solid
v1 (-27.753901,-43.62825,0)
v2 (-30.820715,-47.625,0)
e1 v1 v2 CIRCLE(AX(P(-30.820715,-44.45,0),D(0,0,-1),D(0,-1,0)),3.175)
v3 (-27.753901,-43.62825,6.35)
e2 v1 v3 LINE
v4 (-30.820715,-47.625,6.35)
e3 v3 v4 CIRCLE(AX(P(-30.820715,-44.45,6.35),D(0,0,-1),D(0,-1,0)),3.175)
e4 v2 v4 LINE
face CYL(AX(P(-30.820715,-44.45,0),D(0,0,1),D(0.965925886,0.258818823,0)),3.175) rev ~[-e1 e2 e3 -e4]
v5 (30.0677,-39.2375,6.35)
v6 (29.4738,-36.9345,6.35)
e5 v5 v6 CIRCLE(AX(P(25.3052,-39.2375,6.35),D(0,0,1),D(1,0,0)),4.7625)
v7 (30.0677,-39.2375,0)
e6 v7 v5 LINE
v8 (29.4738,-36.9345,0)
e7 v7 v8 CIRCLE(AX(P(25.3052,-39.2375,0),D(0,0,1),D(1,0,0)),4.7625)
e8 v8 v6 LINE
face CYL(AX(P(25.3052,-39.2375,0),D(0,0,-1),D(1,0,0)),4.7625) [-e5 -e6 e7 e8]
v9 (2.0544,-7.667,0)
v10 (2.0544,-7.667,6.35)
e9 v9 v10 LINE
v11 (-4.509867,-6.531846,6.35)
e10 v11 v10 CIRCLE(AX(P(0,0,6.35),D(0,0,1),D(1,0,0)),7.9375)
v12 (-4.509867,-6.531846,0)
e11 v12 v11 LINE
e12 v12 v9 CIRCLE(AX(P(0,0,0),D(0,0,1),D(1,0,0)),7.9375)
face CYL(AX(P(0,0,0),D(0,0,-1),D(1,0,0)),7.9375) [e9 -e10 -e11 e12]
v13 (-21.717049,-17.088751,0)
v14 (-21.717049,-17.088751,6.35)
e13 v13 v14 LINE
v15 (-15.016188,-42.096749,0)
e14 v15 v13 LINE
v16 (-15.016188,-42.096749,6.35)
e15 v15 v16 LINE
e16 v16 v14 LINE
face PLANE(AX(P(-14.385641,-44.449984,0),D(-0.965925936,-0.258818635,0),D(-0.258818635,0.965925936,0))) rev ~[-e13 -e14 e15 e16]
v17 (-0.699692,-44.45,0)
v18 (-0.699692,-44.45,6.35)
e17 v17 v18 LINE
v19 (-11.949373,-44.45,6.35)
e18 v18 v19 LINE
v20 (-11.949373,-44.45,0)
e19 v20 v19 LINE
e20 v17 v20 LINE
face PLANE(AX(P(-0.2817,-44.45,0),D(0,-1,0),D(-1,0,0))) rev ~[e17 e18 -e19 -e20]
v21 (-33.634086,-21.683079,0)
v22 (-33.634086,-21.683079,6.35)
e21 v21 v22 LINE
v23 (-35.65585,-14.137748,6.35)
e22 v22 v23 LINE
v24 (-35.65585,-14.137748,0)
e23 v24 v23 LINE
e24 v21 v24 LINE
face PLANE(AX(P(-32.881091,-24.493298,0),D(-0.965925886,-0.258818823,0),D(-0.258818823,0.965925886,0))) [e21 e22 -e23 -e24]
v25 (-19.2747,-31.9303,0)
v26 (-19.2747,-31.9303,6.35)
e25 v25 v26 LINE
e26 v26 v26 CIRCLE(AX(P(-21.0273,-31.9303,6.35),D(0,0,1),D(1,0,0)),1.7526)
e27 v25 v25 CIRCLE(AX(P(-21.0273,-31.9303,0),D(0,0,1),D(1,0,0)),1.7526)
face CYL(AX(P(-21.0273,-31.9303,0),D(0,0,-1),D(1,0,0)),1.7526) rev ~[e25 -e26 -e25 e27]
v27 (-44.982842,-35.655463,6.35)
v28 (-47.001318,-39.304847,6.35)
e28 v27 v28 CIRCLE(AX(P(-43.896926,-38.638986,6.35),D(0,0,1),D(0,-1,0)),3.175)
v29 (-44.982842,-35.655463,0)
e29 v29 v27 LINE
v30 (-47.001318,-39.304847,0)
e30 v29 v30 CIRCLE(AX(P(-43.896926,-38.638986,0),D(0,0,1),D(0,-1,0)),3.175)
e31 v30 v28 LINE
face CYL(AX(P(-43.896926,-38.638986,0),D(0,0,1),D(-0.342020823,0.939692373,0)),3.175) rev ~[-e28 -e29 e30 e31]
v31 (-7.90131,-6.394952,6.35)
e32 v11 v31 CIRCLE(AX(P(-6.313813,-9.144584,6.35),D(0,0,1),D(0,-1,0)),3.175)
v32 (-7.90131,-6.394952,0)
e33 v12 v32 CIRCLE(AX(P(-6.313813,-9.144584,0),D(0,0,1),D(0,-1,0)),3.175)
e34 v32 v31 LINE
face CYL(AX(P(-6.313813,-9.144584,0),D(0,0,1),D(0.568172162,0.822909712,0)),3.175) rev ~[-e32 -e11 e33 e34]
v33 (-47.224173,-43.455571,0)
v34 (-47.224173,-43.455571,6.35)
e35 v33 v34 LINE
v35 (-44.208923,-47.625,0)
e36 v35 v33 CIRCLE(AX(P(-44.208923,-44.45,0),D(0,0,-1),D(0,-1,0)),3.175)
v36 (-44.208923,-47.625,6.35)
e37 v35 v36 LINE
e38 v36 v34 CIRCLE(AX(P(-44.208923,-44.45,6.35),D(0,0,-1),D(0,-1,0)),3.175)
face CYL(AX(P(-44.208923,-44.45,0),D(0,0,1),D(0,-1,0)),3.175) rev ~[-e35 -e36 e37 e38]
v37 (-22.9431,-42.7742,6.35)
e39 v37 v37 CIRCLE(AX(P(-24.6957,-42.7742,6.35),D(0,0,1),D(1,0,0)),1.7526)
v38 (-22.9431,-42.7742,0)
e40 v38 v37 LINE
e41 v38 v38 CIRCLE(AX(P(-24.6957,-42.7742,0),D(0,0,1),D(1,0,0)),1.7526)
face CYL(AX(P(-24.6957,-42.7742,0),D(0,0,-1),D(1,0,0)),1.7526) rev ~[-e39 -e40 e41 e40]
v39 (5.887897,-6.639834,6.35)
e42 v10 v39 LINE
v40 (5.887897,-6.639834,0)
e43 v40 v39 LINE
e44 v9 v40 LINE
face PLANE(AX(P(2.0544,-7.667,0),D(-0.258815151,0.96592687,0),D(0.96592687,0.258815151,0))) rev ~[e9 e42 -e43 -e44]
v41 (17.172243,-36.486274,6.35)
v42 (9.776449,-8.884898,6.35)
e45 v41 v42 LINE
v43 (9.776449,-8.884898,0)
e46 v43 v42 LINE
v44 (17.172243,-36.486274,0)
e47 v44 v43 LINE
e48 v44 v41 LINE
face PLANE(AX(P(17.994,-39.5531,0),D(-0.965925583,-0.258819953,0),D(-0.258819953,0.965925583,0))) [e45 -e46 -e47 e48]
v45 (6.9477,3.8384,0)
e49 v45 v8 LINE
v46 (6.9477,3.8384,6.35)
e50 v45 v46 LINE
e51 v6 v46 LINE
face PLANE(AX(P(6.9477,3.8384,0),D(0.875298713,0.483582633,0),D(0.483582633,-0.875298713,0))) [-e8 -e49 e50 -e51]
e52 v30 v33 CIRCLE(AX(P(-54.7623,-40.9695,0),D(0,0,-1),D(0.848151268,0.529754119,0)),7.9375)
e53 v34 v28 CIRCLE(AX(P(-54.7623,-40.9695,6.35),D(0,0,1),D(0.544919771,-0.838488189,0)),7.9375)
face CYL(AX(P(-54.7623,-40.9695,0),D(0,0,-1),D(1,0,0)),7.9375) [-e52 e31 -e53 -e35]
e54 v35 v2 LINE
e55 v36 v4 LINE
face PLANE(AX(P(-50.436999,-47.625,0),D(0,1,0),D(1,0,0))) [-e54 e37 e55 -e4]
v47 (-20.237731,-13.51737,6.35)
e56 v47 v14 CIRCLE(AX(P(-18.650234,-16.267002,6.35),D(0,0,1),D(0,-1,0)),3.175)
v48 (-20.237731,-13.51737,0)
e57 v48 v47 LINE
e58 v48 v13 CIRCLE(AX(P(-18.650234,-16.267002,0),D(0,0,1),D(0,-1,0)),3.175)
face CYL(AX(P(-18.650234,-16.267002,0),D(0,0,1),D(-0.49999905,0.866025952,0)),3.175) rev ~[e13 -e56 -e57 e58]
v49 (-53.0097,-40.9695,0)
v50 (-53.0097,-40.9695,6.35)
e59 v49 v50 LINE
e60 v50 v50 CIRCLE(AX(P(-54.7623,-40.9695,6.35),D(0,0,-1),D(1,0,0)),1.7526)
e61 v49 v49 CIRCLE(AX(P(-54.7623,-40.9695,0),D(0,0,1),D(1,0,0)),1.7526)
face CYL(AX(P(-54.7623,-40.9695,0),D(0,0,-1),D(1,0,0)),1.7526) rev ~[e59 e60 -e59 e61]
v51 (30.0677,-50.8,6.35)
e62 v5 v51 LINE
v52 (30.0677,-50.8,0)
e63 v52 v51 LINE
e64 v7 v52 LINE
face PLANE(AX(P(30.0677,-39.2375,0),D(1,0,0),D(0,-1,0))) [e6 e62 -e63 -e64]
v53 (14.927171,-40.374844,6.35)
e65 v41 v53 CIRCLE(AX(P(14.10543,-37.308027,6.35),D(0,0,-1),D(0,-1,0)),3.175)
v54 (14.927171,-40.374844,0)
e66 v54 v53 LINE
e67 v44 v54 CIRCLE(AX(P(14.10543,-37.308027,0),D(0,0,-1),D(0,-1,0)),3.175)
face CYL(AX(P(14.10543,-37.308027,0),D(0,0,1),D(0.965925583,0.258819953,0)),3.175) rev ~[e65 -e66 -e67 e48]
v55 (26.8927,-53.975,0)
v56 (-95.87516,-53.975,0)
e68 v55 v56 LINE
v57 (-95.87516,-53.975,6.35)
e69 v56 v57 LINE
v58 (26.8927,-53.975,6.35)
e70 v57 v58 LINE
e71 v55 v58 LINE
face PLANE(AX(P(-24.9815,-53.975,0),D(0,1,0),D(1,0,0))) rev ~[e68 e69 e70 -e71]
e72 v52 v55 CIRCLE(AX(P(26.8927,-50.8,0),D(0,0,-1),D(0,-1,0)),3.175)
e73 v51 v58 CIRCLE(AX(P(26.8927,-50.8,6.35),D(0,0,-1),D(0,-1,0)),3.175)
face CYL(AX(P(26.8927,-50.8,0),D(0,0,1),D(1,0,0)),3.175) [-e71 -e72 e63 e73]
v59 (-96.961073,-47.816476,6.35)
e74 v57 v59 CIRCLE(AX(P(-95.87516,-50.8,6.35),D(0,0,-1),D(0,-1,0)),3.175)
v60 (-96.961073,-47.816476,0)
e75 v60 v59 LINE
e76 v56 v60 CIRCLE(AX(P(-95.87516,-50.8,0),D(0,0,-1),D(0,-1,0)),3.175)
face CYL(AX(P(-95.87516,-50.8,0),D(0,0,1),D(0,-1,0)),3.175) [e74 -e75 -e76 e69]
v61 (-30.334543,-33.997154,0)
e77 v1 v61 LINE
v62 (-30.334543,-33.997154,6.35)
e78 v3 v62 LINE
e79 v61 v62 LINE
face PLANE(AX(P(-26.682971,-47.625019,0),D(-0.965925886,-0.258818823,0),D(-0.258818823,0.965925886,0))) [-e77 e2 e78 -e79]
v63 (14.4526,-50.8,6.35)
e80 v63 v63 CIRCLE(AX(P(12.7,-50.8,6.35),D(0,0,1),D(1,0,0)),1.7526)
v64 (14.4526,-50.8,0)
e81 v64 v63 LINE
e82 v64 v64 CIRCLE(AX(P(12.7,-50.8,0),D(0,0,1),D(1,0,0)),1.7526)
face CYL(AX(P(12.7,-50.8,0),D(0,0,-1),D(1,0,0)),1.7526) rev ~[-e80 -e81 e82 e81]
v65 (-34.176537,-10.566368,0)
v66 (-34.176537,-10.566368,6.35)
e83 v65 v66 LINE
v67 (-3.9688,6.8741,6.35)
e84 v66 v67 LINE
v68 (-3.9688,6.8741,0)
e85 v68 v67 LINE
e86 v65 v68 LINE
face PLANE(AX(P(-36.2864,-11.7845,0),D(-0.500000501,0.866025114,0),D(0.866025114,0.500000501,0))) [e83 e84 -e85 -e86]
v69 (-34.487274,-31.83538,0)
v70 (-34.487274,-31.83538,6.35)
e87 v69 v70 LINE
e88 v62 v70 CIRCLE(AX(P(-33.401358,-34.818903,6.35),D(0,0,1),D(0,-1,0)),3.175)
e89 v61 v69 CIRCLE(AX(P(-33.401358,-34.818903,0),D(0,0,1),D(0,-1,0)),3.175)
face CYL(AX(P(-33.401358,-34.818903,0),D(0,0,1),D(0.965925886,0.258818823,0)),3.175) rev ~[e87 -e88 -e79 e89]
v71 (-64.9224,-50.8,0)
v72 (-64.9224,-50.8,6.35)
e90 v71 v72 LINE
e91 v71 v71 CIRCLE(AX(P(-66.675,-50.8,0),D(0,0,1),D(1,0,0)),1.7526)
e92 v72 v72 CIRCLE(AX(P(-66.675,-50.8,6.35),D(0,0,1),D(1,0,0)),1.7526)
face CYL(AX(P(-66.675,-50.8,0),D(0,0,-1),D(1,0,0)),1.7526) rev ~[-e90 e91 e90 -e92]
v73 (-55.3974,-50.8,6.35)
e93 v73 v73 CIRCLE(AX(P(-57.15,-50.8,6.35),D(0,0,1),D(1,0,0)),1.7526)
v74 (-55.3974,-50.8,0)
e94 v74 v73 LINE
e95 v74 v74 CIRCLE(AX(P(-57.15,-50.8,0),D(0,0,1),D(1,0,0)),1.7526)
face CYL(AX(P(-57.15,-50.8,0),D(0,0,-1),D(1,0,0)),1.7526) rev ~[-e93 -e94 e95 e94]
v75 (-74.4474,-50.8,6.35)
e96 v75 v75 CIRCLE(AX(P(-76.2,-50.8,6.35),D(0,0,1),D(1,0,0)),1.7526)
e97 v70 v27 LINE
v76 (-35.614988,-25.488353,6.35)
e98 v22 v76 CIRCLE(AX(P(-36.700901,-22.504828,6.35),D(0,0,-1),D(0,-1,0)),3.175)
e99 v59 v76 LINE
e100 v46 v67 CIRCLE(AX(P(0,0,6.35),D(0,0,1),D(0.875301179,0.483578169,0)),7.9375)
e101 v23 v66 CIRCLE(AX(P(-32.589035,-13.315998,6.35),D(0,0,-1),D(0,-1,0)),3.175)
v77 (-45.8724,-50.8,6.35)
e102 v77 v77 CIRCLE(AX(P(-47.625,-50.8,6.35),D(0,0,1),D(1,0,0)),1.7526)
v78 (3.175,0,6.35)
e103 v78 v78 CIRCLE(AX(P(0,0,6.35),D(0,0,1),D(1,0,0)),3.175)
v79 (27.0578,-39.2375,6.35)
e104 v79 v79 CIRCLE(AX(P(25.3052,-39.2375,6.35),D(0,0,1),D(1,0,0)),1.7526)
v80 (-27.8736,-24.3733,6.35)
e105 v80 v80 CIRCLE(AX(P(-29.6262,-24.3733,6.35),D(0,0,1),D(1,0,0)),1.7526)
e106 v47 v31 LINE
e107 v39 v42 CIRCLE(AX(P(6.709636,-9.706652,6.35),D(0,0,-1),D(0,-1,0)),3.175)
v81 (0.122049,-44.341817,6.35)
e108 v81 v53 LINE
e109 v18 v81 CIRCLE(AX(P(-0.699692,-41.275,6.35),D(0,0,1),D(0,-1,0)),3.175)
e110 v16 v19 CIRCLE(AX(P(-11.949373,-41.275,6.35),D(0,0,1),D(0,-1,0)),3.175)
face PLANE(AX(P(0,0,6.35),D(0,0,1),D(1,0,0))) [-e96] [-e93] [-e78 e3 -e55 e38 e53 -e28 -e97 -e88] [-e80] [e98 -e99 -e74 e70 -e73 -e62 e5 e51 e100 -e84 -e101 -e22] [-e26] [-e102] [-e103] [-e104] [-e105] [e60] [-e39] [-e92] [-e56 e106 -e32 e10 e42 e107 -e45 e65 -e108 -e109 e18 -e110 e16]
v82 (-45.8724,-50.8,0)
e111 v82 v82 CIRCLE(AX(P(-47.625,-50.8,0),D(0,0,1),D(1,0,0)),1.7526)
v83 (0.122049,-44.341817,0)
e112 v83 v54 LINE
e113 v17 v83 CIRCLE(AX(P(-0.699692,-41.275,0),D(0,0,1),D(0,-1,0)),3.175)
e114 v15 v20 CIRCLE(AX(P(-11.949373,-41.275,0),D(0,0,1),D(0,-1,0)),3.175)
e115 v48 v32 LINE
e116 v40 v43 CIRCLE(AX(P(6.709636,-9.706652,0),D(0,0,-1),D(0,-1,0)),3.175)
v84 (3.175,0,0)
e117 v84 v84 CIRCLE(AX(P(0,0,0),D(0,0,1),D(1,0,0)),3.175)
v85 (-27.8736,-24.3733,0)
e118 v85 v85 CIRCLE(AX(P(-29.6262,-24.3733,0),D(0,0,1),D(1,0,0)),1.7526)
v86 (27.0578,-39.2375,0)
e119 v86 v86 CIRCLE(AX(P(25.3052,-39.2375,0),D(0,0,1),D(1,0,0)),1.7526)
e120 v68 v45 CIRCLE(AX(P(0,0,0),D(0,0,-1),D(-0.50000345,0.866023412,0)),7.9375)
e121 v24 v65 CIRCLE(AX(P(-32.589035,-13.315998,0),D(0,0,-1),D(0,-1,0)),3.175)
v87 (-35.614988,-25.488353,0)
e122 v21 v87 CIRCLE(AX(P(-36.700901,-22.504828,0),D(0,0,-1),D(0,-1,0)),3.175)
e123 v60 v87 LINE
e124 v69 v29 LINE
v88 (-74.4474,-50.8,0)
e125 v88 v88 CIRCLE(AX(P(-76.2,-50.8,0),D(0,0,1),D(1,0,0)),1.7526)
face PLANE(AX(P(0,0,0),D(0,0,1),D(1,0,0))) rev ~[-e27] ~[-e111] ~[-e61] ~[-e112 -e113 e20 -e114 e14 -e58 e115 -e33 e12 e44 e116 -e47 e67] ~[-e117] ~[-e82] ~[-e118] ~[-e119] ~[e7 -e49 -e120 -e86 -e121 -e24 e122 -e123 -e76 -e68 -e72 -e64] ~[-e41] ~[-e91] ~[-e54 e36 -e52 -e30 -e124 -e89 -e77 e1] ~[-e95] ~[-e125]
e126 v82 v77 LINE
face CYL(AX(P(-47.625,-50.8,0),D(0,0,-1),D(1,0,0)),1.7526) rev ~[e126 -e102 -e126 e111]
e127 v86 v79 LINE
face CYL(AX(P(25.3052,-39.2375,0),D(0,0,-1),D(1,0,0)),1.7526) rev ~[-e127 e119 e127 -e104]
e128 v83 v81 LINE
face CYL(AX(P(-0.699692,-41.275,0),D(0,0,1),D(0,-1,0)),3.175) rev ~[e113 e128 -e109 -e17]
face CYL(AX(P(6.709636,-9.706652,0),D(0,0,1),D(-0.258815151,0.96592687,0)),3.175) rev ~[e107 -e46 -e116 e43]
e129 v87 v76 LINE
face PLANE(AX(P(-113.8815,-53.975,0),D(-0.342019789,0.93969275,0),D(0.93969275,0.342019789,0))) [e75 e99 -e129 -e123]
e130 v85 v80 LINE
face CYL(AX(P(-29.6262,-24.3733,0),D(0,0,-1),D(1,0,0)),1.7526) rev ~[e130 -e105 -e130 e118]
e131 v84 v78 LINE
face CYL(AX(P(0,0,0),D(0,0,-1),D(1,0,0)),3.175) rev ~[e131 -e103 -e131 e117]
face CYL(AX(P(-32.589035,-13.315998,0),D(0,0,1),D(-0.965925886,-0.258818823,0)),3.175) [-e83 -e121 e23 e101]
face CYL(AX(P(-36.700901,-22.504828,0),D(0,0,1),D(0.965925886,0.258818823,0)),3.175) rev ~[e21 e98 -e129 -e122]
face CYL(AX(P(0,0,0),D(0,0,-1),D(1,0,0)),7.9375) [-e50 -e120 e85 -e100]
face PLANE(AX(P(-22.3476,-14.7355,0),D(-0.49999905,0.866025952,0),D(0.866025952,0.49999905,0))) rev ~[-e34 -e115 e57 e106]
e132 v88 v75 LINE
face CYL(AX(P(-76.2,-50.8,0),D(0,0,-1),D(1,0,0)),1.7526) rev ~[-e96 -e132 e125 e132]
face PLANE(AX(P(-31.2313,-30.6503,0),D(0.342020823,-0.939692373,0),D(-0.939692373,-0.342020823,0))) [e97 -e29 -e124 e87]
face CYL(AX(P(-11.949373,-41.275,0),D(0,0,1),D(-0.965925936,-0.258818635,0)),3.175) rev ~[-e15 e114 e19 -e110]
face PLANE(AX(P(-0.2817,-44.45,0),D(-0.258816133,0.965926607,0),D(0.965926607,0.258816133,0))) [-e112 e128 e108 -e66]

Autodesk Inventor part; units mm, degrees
ref_plane "YZ Plane" through (0, 0, 0) normal (1, 0, 0) x (0, 1, 0)
ref_plane "XZ Plane" through (0, 0, 0) normal (0, 1, 0) x (-1, 0, 0)
ref_plane "XY Plane" through (0, 0, 0) normal (0, 0, 1) x (1, 0, 0)
sketch "Sketch2" plane through (0, 0, 0) normal (0, 0, 1) x (1, 0, 0)
  circle A0 centre (0, 0) radius 3.175
  circle A1 centre (0, 0) radius 7.9375
  line L0 (-24.9815, -53.975) -> (30.0677, -53.975)
  line L1 (-24.9815, -53.975) -> (-36.2864, -11.7845)
  line L2 (-36.2864, -11.7845) -> (-3.9688, 6.8741)
  line L3 (20.5427, -47.625) -> (-13.5349, -47.625)
  line L4 (-13.5349, -47.625) -> (-22.3476, -14.7355)
  line L5 (-22.3476, -14.7355) -> (-5.9414, -5.2634)
  line L6 (-18.5621, -41.1307) -> (-23.4926, -22.7298) construction
  line L7 (-23.4926, -22.7298) -> (-29.6262, -24.3733) construction
  line L8 (-29.6262, -24.3733) -> (-24.6957, -42.7742) construction
  line L9 (-24.6957, -42.7742) -> (-18.5621, -41.1307) construction
  line L10 (-18.5621, -41.1307) -> (-29.6262, -24.3733) construction
  line L11 (-23.4926, -22.7298) -> (-24.6957, -42.7742) construction
  circle A2 centre (-29.6262, -24.3733) radius 1.7526
  circle A3 centre (-24.6957, -42.7742) radius 1.7526
  circle A4 centre (-21.0273, -31.9303) radius 1.7526
  line L12 (25.3052, -45.5804) -> (25.3052, -53.975) construction
  circle A5 centre (25.3052, -39.2375) radius 1.7526
  line L13 (0, 0) -> (-58.6646, -15.7191) construction
  line L14 (-24.0941, -32.752) -> (-30.6681, -8.2175) construction
  circle A6 centre (25.3052, -39.2375) radius 4.7625
  line L15 (30.0677, -39.2375) -> (30.0677, -53.975)
  line L16 (20.5427, -39.2375) -> (20.5427, -47.625)
  line L17 (-30.2278, -34.3955) -> (-17.9605, -31.1085) construction
  line L18 (-24.9815, -53.975) -> (-113.8815, -53.975)
  circle A7 centre (-9.9632, -48.6877) radius 1.7526
  line L19 (-9.9632, -48.6877) -> (-25.2973, -52.7964) construction
  line L20 (25.3052, -39.2375) -> (24.0725, -34.6373) construction
  line L21 (-31.2313, -30.6503) -> (-77.8688, -47.625)
  line L22 (-77.8688, -47.625) -> (-26.6829, -47.625)
  line L23 (-9.9632, -48.6877) -> (-10.4168, -46.9948) construction
  circle A8 centre (25.3052, -39.2375) radius 1.7526
  circle A9 centre (25.3052, -39.2375) radius 4.7625
  line L24 (17.994, -39.5531) -> (8.9547, -5.8181)
  line L25 (8.9547, -5.8181) -> (-22.4801, -14.241) construction
  line L26 (-22.4801, -14.241) -> (-13.4409, -47.976) construction
  line L27 (-0.2817, -44.45) -> (17.994, -39.5531)
  line L28 (17.994, -39.5531) -> (-22.4801, -14.241) construction
  line L29 (8.9547, -5.8181) -> (-13.4409, -47.976) construction
  line L30 (6.9477, 3.8384) -> (29.4738, -36.9345)
  line L31 (2.0544, -7.667) -> (8.9547, -5.8181)
  circle A10 centre (-9.9632, -48.6877) radius 4.7625 construction
  line L32 (-0.2817, -44.45) -> (-14.3857, -44.45)
  line L33 (-113.8815, -53.975) -> (-32.8811, -24.4933)
  circle A11 centre (-54.7623, -40.9695) radius 1.7526
  circle A12 centre (-54.7623, -40.9695) radius 7.9375
  line L34 (-54.7623, -40.9695) -> (-56.8404, -33.2138) construction
  line L35 (-25.8322, -50.8) -> (-105.1582, -50.8) construction
  circle A13 centre (-47.625, -50.8) radius 1.7526
  circle A14 centre (-57.15, -50.8) radius 1.7526
  circle A15 centre (-66.675, -50.8) radius 1.7526
  circle A16 centre (-76.2, -50.8) radius 1.7526
  circle A17 centre (12.7, -50.8) radius 1.7526
  line L36 (0.6918, 7.9073) -> (27.1694, 5.5908)
  circle A18 centre (26.8927, 2.4279) radius 1.7526
  circle A19 centre (26.8927, 2.4279) radius 3.175
  line L37 (8.6038, 0.8408) -> (26.616, -0.735)
  circle A20 centre (17.4039, 3.258) radius 1.7526
  line L38 (-9.9632, -48.6877) -> (-9.9632, -48.6877) construction
  point P0 (7.667, 2.0544)
  point P1 (0.4795, -7.923)
  point P2 (-24.0941, -32.752)
  point P3 (-2.2431, -26.897)
  point P4 (-2.2431, -26.897)
  point P5 (-12.1309, -47.625)
  point P6 (-15.5208, -47.3441)
  point P7 (29.4738, -36.9345)
  point P8 (-14.3857, -44.45)
  point P9 (-9.6568, -46.9621)
  point P10 (-9.6568, -46.9621)
  point P11 (-48.0301, -36.7646)
  point P12 (-59.0876, -47.625)
  point P13 (-62.6223, -42.0757)
  point P14 (-50.4369, -47.625)
  point P15 (13.8439, -8.6439)
  point P16 (24.4605, 0.387)
  point P17 (23.7298, 2.7046)
  dimension "d7" = 15.875
  dimension "d40" = 3.5052
  dimension "d6" = 6.35
  dimension "Angle_Mount" = 105
  dimension "d17" = 105
  dimension "d19" = 9.525
  dimension "d20" = 12.7
  dimension "d24" = 19.05
  dimension "d25" = 6.35
  dimension "d26" = 3.5052
  dimension "d27" = 3.5052
  dimension "d28" = 3.5052
  dimension "d29" = 6.35
  dimension "d33" = 3.5052
  dimension "d35" = 31.75
  dimension "d37" = 9.525
  dimension "d38" = 25.4
  dimension "d39" = 53.975
  dimension "d41" = 44.45
  dimension "Rail_Offset" = 36.5125
  dimension "d45" = 6.35
  dimension "d48" = 22.225
  dimension "d49" = 3.5052
  dimension "d51" = 9.525
  dimension "d52" = 32.5438
  dimension "d53" = 34.925
  dimension "d54" = 9.525
  dimension "d56" = 9.525
  dimension "d58" = 6.35
  dimension "d60" = 20
  dimension "d61" = 88.9
  dimension "d69" = 31.75
  dimension "d71" = 3.5052
  dimension "d72" = 15.875
  dimension "d74" = 3.175
  dimension "d75" = 3.5052
  dimension "d76" = 47.625
  dimension "d79" = 9.525
  dimension "d84" = 3.5052
  dimension "d85" = 60.325
  dimension "d86" = 145
  dimension "d87" = 3.5052
  dimension "d88" = 6.35
  dimension "d101" = 9.525
extrude "Extrusion2" add sketch "Sketch2" along normal blind 6.35 contours A1 | A1 L30 A6 L16 L3 A7 L4 L32 L27 L24 L31 | L5 L4 L3 A7 L16 A6 L15 L0 L1 L2 A1 | A6 | L1 L21 A12 L22 L18 L33 | A7 L3 | L3 A7 | A12 L22 L21 A11 | L21 A11 A12 | A12 L22 | A12 L22 L21
fillet "Fillet1" radius 3.175 15 edges at (-22.3476, -14.7355, 3.175) (-5.9414, -5.2634, 3.175) (8.9547, -5.8181, 3.175) (17.994, -39.5531, 3.175) (-14.3857, -44.45, 3.175) (-0.2817, -44.45, 3.175) (30.0677, -53.975, 3.175) (-36.2864, -11.7845, 3.175) (-26.6829, -47.625, 3.175) (-50.4369, -47.625, 3.175) (-48.0301, -36.7646, 3.175) (-31.2313, -30.6503, 3.175) (-32.8811, -24.4933, 3.175) (-113.8815, -53.975, 3.175) (6.9477, 3.8384, 3.175)
properties part number "Uprights" material "Aluminum 6061"
